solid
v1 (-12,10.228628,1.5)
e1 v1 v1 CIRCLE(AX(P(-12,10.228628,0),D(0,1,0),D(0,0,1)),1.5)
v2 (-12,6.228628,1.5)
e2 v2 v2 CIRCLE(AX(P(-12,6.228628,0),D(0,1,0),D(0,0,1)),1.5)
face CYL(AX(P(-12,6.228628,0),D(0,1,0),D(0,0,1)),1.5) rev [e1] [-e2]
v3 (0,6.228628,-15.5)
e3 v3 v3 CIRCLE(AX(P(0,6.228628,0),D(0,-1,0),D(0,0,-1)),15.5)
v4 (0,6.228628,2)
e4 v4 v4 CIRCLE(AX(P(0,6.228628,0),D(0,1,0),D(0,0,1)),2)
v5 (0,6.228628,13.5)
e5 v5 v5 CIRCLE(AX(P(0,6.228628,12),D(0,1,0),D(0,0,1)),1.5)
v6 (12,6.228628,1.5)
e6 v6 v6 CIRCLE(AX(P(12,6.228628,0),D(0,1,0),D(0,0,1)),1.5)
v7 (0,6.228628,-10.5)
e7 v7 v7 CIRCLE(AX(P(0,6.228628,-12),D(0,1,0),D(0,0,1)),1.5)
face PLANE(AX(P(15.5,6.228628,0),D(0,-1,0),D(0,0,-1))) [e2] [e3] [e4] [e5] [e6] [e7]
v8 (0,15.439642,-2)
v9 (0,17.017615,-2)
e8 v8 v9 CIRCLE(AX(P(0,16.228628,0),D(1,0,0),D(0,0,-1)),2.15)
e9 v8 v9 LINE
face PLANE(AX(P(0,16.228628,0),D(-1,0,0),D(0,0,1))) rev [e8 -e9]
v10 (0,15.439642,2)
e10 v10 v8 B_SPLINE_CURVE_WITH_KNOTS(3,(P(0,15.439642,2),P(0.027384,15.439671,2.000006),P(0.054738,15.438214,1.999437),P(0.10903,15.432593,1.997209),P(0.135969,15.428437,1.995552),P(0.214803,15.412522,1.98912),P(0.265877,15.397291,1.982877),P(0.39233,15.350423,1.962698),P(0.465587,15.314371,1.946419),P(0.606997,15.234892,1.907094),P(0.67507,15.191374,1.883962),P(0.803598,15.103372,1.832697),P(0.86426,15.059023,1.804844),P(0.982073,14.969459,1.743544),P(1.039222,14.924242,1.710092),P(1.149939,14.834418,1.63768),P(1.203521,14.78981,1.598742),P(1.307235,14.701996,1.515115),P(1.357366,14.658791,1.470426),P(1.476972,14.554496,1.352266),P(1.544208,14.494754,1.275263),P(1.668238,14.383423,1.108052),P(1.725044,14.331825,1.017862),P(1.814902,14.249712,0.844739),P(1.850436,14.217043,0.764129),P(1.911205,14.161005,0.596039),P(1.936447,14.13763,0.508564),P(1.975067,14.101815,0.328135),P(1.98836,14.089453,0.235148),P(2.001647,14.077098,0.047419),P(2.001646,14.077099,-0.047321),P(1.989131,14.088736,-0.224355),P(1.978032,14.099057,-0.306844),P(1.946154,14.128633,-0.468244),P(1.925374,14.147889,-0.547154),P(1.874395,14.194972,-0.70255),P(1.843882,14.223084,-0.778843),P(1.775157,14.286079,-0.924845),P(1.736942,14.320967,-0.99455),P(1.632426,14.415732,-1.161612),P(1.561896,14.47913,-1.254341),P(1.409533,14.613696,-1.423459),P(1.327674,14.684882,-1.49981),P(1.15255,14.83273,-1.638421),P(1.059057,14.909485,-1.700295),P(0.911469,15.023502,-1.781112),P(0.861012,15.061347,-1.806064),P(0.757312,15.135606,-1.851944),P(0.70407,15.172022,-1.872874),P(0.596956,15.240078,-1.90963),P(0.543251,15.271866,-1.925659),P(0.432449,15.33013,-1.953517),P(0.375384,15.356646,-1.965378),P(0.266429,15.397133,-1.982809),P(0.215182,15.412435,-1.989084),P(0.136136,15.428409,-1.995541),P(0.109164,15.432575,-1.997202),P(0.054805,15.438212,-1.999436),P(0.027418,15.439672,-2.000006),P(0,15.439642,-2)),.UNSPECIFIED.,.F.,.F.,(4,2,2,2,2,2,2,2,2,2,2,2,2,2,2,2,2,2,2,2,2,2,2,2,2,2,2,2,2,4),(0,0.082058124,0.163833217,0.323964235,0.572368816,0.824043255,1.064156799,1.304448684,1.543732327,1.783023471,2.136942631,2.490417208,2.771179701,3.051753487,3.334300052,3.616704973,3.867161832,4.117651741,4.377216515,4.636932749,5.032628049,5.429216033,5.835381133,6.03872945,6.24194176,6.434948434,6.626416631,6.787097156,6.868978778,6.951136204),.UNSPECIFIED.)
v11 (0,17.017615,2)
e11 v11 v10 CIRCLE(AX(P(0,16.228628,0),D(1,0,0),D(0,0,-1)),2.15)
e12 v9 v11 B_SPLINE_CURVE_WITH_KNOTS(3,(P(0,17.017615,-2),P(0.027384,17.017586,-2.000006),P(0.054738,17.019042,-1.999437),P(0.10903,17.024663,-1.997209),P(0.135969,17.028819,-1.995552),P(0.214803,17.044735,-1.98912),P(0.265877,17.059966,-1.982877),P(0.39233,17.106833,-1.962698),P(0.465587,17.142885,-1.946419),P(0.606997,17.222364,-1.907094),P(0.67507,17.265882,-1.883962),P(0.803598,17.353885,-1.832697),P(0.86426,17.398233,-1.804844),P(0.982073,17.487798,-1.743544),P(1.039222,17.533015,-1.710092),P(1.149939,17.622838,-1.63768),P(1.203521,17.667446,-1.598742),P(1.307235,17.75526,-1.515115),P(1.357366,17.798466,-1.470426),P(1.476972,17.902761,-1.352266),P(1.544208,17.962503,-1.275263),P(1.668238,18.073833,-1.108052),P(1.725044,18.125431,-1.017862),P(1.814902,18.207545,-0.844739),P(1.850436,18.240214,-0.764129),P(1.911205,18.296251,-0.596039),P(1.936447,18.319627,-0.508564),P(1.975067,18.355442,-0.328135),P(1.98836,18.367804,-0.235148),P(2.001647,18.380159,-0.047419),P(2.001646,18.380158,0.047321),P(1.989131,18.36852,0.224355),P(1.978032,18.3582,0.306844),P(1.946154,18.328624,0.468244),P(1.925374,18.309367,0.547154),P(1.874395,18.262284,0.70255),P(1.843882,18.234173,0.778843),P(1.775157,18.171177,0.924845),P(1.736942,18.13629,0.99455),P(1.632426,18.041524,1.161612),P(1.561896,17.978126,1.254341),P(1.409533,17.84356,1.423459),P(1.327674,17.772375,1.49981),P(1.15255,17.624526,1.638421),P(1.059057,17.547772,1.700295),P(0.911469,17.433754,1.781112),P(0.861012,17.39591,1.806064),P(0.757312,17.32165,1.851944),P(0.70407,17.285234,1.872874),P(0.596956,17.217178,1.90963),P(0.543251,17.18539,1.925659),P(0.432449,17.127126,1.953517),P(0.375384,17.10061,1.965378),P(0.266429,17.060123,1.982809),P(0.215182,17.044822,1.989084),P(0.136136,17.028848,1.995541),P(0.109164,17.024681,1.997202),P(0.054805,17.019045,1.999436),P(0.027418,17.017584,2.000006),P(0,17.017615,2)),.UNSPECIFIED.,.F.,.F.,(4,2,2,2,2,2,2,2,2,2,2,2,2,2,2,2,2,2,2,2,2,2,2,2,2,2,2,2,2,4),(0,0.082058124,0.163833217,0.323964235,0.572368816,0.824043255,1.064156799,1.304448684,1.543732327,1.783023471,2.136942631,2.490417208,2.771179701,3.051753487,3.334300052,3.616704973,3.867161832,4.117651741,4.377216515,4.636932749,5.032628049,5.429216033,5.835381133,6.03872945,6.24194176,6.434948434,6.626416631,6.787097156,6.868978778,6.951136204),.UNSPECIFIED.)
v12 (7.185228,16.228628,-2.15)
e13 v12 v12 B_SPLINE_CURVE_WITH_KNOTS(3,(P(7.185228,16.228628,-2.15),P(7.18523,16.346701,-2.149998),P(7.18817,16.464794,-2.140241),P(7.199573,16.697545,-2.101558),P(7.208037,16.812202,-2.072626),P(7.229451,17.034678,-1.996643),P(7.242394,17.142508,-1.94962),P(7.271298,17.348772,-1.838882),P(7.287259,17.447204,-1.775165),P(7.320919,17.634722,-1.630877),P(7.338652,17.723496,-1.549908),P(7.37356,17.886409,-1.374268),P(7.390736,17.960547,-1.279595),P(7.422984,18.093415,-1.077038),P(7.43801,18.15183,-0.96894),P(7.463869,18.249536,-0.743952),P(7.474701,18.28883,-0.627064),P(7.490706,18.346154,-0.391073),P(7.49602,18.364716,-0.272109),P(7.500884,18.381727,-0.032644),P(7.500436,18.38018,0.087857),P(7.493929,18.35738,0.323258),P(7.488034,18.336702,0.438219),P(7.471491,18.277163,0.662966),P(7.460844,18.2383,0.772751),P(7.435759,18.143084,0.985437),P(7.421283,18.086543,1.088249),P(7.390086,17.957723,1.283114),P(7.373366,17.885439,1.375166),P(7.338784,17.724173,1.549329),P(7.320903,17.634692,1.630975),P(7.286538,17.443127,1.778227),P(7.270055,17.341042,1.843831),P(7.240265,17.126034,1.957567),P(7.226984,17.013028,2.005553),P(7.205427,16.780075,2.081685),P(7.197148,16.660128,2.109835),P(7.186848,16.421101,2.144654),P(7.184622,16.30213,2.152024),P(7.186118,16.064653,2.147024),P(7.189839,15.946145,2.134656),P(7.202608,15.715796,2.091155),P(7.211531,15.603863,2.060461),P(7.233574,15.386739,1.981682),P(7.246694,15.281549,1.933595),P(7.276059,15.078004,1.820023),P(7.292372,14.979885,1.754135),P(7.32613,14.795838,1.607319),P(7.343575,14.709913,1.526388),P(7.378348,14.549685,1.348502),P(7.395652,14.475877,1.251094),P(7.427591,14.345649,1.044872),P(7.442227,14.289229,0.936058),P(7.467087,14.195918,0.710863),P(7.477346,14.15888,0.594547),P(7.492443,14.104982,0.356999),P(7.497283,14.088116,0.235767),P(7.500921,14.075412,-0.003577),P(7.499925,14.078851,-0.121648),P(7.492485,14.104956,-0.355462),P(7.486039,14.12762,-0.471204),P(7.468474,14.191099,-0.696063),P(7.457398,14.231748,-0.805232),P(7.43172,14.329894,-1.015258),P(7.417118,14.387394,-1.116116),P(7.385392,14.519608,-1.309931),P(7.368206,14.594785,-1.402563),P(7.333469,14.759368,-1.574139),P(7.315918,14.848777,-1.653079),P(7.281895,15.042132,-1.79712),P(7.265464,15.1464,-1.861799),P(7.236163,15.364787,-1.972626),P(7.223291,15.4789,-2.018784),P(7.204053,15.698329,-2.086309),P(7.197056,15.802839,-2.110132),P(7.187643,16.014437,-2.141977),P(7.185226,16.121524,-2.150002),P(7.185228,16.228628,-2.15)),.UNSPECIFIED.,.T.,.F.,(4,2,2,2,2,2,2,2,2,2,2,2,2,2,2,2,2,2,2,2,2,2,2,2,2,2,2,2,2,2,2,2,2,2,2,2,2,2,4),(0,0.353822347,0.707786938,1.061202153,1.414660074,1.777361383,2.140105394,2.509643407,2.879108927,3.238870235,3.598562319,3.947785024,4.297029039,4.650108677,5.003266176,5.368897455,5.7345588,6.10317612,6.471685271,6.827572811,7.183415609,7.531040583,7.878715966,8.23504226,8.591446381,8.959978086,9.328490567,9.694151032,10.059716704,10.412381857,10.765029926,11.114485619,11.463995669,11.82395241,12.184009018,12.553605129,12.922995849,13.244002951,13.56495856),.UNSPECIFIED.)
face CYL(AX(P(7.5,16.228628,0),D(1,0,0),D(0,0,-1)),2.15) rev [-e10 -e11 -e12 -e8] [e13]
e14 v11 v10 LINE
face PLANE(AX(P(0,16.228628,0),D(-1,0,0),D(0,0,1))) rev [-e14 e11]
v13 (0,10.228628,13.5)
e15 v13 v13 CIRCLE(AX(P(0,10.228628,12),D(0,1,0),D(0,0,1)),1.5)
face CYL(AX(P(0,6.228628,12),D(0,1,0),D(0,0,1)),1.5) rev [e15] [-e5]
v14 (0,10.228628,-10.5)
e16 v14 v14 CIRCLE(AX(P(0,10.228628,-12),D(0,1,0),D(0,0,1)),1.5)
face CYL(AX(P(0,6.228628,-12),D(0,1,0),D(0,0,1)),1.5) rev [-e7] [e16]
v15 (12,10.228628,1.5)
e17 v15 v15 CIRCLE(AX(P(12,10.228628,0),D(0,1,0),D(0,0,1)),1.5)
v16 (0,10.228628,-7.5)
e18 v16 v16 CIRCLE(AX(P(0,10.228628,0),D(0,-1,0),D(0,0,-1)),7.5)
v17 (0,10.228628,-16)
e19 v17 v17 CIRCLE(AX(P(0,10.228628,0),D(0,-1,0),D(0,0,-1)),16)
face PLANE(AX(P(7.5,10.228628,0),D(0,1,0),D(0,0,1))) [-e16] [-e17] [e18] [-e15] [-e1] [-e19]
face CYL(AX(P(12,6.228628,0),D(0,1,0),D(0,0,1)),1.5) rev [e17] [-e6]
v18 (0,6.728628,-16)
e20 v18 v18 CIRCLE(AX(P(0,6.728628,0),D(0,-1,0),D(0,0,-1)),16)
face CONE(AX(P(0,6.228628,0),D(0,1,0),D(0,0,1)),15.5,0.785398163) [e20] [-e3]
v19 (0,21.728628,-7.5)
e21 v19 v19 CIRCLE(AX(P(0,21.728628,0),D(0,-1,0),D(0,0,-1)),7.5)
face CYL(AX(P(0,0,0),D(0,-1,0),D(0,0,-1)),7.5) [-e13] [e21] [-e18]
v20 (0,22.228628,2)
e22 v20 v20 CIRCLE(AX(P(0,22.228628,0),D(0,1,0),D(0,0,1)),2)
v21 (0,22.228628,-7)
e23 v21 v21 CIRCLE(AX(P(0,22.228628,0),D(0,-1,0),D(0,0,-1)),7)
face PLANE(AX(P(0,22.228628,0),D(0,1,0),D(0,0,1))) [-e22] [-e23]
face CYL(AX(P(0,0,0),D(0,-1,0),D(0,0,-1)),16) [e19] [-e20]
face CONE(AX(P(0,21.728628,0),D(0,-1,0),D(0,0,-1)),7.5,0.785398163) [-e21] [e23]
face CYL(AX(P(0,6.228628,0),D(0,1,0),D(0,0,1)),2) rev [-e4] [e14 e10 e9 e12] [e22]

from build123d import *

# Parameters (mm, degrees)
SKETCH3_R                    = 2
CUT_EXTRUDE1_DEPTH           = 28.712812921
M4_CLEARANCE_HOLE1_OUTLINE_W = 2.15
M4_CLEARANCE_HOLE1_OUTLINE_H = 7.500042463
SKETCH13_R                   = 1.5
CUT_EXTRUDE3_DEPTH           = 26.612496997


# Read off the part's stored shape, not the designer's step: M4 Clearance Hole1
with BuildPart() as part:
    # Sketch2 → Revolve1 (revolve)
    with BuildSketch(Plane.XY, mode=Mode.PRIVATE) as revolve1_sk:
        Polygon((0, 22.228628213), (7, 22.228628213), (7.5, 21.728628213), (7.5, 10.228628213), (16, 10.228628213), (16, 6.728628213), (15.5, 6.228628213), (0, 6.228628213), align=None)
    revolve(revolve1_sk.sketch.rotate(Axis((0, 0, 0), (0, 1, 0)), 90), axis=Axis((0, 0, 0), (0, 1, 0)))

    # Sketch3 → Cut-Extrude1 (cut, through all)
    with BuildSketch(Plane(origin=(0, 22.228628213, 0), x_dir=(1, 0, 0), z_dir=(0, 1, 0))):
        with Locations(Location((0, 0, 0), (0, 0, 270))):
            Circle(SKETCH3_R)
    extrude(amount=-CUT_EXTRUDE1_DEPTH, mode=Mode.SUBTRACT)

    # M4 Clearance Hole1 outline → M4 Clearance Hole1 (revolve, cut)
    with BuildSketch(Plane(origin=(0, 16.228628213, 0), x_dir=(0, 1, 0), z_dir=(0, 0, -1))):
        with Locations((1.075, 3.750021232)):
            Rectangle(M4_CLEARANCE_HOLE1_OUTLINE_W, M4_CLEARANCE_HOLE1_OUTLINE_H)
    revolve(axis=Axis((0, 16.228628213, 0), (1, 0, 0)), mode=Mode.SUBTRACT)

    # Sketch13 → Cut-Extrude3 (cut, through all)
    with BuildSketch(Plane(origin=(0, 10.228628213, 0), x_dir=(1, 0, 0), z_dir=(0, 1, 0))):
        with Locations(Location((-12, 0, 0), (0, 0, 270))):
            Circle(SKETCH13_R)
        with Locations(Location((0, 12, 0), (0, 0, 270))):
            Circle(SKETCH13_R)
        with Locations(Location((12, 0, 0), (0, 0, 270))):
            Circle(SKETCH13_R)
        with Locations(Location((0, -12, 0), (0, 0, 270))):
            Circle(SKETCH13_R)
    extrude(amount=-CUT_EXTRUDE3_DEPTH, mode=Mode.SUBTRACT)


solid = part.part
